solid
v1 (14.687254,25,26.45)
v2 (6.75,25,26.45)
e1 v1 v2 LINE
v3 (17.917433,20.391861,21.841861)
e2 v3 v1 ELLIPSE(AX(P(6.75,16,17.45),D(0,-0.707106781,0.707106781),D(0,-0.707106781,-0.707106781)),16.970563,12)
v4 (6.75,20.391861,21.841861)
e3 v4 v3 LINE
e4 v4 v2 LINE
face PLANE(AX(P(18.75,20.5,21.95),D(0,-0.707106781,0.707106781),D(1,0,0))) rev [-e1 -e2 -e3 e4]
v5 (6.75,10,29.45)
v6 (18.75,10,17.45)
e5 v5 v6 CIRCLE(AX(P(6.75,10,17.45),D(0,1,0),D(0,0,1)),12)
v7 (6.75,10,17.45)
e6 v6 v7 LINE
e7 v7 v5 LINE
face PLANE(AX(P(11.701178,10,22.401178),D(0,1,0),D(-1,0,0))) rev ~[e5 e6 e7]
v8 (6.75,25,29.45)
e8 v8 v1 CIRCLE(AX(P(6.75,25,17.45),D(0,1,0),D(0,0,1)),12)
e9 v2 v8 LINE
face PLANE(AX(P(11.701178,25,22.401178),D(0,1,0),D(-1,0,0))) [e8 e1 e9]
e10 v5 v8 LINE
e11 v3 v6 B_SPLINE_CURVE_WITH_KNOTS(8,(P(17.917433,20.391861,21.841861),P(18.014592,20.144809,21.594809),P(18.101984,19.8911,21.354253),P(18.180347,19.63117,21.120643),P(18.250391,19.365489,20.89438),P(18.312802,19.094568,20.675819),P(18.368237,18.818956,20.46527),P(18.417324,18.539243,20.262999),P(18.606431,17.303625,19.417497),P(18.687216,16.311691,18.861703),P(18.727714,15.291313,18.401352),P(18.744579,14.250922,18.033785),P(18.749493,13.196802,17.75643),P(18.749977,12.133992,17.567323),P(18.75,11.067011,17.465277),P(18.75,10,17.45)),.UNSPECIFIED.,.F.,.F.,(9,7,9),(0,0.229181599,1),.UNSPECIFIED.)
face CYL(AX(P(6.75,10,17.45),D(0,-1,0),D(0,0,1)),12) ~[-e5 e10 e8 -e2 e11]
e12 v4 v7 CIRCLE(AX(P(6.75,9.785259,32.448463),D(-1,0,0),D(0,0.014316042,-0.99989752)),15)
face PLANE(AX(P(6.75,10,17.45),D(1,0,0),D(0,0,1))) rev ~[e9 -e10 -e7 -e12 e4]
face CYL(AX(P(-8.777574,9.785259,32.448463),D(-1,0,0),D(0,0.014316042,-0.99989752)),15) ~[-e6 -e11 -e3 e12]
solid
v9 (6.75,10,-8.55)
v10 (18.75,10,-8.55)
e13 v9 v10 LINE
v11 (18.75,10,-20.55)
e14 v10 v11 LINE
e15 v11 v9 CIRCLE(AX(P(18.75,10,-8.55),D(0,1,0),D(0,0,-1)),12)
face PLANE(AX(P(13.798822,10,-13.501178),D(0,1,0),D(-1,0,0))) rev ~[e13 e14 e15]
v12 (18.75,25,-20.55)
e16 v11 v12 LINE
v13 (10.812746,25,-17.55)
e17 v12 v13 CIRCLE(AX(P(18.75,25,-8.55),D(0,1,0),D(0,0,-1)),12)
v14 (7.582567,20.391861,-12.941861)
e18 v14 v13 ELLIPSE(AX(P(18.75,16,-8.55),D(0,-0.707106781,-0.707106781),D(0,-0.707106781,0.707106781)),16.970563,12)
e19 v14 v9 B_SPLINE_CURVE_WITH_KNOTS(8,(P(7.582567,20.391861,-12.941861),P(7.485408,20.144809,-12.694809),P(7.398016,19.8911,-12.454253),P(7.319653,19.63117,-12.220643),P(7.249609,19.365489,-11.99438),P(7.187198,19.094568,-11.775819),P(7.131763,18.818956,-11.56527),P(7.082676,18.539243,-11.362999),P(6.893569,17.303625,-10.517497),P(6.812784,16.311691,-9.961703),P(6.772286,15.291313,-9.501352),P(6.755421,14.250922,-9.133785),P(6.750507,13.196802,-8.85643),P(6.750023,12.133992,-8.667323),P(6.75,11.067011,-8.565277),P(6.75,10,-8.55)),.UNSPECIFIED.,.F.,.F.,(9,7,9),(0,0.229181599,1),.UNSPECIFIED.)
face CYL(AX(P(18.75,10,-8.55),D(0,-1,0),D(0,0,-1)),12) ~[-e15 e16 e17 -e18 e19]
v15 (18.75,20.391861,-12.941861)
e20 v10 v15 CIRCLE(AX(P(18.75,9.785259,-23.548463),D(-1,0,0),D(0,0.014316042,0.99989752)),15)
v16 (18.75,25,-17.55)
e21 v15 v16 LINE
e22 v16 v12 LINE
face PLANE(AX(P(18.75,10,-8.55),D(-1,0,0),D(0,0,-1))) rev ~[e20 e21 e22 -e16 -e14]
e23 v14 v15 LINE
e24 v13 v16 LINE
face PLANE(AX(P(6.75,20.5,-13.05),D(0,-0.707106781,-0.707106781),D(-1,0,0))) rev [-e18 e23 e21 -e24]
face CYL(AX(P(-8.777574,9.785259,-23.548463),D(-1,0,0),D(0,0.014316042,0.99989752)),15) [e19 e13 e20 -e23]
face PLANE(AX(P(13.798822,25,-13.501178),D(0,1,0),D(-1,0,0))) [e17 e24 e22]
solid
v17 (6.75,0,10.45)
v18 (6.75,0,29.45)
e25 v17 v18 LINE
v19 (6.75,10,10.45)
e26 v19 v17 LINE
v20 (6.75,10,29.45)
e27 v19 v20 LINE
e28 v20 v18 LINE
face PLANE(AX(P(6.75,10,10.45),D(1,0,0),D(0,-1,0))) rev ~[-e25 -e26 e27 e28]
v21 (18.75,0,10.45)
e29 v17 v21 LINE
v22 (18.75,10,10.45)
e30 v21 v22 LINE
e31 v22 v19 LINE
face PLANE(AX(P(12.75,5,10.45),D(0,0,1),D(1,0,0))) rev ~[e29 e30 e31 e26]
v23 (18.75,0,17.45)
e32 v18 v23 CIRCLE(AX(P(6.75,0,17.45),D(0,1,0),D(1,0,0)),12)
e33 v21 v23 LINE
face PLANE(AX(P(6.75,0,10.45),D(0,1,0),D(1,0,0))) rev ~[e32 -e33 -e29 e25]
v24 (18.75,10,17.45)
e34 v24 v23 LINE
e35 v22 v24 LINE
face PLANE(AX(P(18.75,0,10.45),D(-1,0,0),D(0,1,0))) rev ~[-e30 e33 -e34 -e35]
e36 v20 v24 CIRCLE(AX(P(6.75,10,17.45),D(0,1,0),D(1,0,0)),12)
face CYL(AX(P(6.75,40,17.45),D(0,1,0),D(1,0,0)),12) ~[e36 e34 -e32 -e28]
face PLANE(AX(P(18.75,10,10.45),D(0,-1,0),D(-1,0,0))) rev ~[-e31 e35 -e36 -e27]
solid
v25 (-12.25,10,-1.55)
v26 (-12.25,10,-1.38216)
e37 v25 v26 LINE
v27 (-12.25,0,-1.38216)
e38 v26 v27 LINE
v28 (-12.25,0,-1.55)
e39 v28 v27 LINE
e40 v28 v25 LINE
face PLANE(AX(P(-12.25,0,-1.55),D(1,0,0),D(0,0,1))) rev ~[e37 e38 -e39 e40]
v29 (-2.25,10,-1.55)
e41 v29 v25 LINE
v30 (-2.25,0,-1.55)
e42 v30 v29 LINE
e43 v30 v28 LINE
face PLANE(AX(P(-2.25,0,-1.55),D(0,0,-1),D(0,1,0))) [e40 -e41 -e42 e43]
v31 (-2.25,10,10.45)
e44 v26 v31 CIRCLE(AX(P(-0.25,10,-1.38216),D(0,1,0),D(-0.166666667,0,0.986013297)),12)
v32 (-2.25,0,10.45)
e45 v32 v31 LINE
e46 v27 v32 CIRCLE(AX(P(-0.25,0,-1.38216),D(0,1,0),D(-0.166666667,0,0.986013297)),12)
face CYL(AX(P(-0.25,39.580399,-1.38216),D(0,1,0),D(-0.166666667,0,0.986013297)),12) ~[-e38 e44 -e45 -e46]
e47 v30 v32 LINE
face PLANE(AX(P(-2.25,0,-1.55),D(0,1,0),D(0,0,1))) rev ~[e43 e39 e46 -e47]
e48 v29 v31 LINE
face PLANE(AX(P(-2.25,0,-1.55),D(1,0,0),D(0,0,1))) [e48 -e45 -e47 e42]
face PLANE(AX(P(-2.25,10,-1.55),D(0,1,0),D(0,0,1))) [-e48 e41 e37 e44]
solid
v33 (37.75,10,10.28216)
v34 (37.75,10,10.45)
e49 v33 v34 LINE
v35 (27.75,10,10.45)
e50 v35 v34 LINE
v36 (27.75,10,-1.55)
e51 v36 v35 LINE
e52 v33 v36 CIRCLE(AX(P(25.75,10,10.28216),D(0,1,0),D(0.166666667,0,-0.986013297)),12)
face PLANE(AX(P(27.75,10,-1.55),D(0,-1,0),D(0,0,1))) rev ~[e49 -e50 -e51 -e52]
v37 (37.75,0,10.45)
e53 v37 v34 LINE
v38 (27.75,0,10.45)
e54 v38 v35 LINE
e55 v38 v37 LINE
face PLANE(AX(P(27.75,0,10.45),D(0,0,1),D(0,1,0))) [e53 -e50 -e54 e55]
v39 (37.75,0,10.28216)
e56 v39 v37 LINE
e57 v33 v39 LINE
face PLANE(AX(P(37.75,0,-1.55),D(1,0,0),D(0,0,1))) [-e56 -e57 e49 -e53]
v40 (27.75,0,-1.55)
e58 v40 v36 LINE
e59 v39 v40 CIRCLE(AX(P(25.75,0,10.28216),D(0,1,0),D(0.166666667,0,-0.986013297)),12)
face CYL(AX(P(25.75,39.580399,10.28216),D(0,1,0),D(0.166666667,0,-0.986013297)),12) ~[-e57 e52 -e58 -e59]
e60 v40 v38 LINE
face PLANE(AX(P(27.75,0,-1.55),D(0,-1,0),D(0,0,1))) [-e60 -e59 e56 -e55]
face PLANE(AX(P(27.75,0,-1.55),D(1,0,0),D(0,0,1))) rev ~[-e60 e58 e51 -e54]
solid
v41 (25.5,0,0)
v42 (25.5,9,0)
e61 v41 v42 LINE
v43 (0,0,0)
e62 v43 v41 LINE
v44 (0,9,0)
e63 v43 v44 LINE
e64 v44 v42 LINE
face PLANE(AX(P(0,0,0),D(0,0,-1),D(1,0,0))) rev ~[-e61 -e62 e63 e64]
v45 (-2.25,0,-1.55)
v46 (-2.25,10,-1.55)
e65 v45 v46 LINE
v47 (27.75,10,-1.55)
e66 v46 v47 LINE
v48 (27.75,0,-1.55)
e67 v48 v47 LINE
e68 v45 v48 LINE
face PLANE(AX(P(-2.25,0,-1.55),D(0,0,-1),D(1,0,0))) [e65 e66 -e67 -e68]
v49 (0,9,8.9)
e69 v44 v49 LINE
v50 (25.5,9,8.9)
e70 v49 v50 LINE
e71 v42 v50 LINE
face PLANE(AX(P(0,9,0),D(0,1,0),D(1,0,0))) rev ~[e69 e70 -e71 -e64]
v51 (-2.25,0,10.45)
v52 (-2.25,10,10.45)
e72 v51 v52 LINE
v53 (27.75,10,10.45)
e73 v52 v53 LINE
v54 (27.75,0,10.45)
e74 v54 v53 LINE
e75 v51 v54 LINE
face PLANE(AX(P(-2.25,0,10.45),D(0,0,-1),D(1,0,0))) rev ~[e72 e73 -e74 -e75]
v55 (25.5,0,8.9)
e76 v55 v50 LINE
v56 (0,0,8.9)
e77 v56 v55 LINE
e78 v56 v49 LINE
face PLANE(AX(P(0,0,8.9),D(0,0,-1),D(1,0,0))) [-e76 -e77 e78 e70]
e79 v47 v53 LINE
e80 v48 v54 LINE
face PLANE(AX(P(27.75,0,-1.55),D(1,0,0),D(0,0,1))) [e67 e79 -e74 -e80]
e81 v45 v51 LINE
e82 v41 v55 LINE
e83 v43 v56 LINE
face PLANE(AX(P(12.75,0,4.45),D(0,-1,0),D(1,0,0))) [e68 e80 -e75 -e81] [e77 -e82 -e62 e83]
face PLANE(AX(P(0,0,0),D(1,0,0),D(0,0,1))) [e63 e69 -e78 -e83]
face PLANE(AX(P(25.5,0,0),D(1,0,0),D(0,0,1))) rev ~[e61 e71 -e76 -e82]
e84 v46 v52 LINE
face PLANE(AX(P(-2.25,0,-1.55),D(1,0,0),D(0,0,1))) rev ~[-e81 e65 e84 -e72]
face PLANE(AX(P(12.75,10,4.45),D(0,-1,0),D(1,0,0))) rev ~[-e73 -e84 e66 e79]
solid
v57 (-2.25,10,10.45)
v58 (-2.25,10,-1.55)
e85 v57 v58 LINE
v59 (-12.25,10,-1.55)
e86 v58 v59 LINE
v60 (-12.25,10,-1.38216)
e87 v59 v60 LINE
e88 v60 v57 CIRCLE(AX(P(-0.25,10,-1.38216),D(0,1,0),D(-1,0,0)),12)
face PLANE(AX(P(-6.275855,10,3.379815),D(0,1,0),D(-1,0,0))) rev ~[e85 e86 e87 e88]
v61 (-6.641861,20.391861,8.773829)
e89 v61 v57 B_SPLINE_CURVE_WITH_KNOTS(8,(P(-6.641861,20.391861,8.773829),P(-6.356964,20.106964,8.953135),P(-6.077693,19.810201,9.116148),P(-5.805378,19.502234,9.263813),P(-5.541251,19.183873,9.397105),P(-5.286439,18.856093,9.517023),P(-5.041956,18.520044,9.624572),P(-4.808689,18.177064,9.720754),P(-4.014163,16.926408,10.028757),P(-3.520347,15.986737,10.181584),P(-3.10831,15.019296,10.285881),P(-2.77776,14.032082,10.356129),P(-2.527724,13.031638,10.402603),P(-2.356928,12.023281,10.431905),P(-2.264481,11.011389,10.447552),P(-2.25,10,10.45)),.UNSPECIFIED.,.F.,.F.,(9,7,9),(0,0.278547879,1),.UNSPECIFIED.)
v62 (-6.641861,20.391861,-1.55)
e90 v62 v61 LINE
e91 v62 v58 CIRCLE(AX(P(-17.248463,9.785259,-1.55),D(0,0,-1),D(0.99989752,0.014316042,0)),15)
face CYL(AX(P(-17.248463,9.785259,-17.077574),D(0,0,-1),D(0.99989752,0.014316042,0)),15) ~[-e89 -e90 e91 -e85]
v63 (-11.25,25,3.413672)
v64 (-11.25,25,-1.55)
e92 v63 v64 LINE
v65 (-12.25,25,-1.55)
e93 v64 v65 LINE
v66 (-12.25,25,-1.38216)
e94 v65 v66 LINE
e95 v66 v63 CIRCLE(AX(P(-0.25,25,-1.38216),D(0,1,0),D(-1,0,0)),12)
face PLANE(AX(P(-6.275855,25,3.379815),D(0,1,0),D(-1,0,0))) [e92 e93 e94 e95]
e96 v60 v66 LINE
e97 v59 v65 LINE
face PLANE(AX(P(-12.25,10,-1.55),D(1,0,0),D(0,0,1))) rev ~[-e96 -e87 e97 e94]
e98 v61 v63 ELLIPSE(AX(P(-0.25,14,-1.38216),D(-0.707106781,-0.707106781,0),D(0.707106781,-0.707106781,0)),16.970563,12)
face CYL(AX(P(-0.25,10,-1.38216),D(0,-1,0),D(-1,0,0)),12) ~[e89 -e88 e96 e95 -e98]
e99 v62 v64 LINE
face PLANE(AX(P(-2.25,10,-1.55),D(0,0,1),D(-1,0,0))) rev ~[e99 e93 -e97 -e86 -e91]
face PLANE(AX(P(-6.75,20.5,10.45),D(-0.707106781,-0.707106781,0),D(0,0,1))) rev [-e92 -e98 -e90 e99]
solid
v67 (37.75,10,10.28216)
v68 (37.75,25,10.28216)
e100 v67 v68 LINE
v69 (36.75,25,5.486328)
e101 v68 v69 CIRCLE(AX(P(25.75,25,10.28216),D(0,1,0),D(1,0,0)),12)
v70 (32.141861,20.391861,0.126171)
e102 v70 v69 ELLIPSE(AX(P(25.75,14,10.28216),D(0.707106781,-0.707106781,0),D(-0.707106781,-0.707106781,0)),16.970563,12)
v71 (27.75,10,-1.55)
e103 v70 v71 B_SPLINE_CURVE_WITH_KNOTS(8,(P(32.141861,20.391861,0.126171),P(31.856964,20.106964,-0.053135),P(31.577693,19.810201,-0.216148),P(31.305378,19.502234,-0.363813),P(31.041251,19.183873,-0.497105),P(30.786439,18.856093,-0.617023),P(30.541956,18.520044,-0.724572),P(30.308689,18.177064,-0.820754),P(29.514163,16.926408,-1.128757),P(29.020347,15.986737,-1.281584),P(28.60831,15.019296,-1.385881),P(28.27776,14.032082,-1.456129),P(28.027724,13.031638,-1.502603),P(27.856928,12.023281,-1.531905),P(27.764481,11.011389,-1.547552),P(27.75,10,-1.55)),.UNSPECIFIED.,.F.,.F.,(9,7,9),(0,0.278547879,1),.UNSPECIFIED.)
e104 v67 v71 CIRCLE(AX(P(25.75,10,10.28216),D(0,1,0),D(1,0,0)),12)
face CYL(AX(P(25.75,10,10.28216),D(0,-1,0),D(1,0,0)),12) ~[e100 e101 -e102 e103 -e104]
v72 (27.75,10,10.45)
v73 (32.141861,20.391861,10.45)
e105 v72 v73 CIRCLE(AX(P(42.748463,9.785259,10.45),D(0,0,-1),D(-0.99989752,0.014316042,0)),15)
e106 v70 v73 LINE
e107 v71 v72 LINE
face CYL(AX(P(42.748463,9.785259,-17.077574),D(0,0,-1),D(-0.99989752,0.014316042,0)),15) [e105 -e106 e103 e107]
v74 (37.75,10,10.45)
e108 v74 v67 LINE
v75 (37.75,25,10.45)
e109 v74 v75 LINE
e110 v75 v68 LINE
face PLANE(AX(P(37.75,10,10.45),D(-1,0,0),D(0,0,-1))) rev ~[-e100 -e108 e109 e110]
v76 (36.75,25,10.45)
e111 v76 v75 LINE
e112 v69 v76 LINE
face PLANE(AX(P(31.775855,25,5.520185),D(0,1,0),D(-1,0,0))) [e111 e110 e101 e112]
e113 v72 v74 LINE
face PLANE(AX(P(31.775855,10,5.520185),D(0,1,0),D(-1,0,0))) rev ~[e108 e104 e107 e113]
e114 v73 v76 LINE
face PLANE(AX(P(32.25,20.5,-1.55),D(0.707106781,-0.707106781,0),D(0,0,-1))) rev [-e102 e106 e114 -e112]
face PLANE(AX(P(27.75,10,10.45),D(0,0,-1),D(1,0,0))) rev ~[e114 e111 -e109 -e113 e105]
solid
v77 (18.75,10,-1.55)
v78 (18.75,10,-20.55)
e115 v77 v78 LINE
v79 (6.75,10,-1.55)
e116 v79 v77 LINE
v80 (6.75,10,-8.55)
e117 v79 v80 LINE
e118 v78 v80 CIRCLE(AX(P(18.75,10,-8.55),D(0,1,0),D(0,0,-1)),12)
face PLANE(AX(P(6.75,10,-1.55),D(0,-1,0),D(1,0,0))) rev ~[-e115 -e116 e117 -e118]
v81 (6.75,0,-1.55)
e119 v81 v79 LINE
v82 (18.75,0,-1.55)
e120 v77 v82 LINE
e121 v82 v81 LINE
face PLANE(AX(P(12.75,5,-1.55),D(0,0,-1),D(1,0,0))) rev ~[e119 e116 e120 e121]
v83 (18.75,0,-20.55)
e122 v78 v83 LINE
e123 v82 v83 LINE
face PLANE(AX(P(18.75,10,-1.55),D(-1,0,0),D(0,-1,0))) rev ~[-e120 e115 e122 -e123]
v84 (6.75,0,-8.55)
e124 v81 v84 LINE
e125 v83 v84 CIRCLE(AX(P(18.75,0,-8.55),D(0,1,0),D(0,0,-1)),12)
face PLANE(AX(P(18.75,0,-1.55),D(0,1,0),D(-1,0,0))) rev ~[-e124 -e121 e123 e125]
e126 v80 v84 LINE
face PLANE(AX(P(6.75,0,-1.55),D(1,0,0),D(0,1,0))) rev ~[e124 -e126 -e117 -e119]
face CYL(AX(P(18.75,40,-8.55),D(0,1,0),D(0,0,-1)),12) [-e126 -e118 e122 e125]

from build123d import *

# Parameters (mm, degrees)
F0_W            = 25.5
F0_H            = 8.9
F1_DEPTH        = 8.9
F2_W            = 30
F2_H            = 12
F2_W_2          = 25.5
F2_H_2          = 8.9
F3_DEPTH        = 10
F4_DEPTH        = 9
F5_DEPTH        = 10
F6_DEPTH        = 10
F8_DEPTH        = 19
F10_DEPTH       = 19
F11_T1_DEPTH    = 69.160797831
F11_2_T1_DEPTH  = 69.160797831
F11_3_T1_DEPTH  = 70
F11_4_T1_DEPTH  = 70
F13_DEPTH       = 15
F14_SIZE        = 9
F15_T1_DEPTH    = 43.0551475556
F15_S1_T1_DEPTH = 43.0551475556
F15_S2_T1_DEPTH = 43.0551475556
F15_S3_T1_DEPTH = 43.0551475556


# Not quite as in the source:
# - a fillet or chamfer that OpenCascade refuses, or shapes differently, is made with other operations: its cross-section is extruded or revolved along the edge and cut away or added


with BuildPart() as f1:
    # F0 (on Top) → F1 (new body)
    with BuildSketch(Plane.XY):
        with Locations((12.75, 4.45)):
            Rectangle(F0_W, F0_H)
    extrude(amount=F1_DEPTH)


with BuildPart() as f3:
    # F2 (on face) → F3 (new body)
    with BuildSketch(Plane.XZ):
        with Locations((12.75, 4.45)):
            Rectangle(F2_W, F2_H)
        with Locations((12.75, 4.45)):
            Rectangle(F2_W_2, F2_H_2, mode=Mode.SUBTRACT)
        with Locations((12.75, 4.45)):
            Rectangle(F2_W_2, F2_H_2)
    extrude(amount=-F3_DEPTH)


with BuildPart() as f4_tool:
    # F4 (cut): a face of the model
    f4_faces = [f1.part.faces().sort_by_distance(p)[0] for p in [
        (12.75, 0, 4.45),
    ]]
    extrude(f4_faces, amount=-F4_DEPTH)


with BuildPart() as f1_1:
    add(f1.part)

    # F4: cut by f4_tool
    add(f4_tool.part, mode=Mode.SUBTRACT)


with BuildPart() as f3_1:
    add(f3.part)

    # F4: cut by f4_tool
    add(f4_tool.part, mode=Mode.SUBTRACT)


with BuildPart() as f5:
    # F5 (new): a face of the model
    f5_faces = [f3_1.part.faces().sort_by_distance(p)[0] for p in [
        (-2.25, 5, 4.45),
    ]]
    extrude(f5_faces, amount=F5_DEPTH)

    # F11: fillet of radius 12 on 1 edges, made by hand

    # F11_s2 → F11_t1 (cut)
    with BuildSketch(Plane.XZ.offset(-39.5803989155)):
        with BuildLine():
            ThreePointArc((-2.25, 10.45), (-9.4151513899, 6.3638071262), (-12.25, -1.3821595662))
            Line((-12.25, -1.3821595662), (-12.25, 10.45))
            Line((-12.25, 10.45), (-2.25, 10.45))
        make_face()
    extrude(amount=F11_T1_DEPTH, mode=Mode.SUBTRACT)


with BuildPart() as f6:
    # F6 (new): a face of the model
    f6_faces = [f3_1.part.faces().sort_by_distance(p)[0] for p in [
        (27.75, 5, 4.45),
    ]]
    extrude(f6_faces, amount=F6_DEPTH)

    # F11#2: fillet of radius 12 on 1 edges, made by hand

    # F11_2_s2 → F11_2_t1 (cut)
    with BuildSketch(Plane.XZ.offset(-39.5803989155)):
        with BuildLine():
            ThreePointArc((27.75, -1.55), (34.9151513899, 2.5361928738), (37.75, 10.2821595662))
            Line((37.75, 10.2821595662), (37.75, -1.55))
            Line((37.75, -1.55), (27.75, -1.55))
        make_face()
    extrude(amount=F11_2_T1_DEPTH, mode=Mode.SUBTRACT)


with BuildPart() as f8:
    # F7 (on face) → F8 (new body)
    with BuildSketch(Plane.XY.offset(10.45)):
        Polygon((6.75, 0), (12.75, 0), (18.75, 0), (18.75, 10), (12.75, 10), (6.75, 10), align=None)
    extrude(amount=F8_DEPTH)

    # F11#3: fillet of radius 12 on 1 edges, made by hand

    # F11_3_s2 → F11_3_t1 (cut)
    with BuildSketch(Plane.XZ.offset(-40)):
        with BuildLine():
            ThreePointArc((18.75, 17.45), (15.2352813742, 25.9352813742), (6.75, 29.45))
            Line((6.75, 29.45), (18.75, 29.45))
            Line((18.75, 29.45), (18.75, 17.45))
        make_face()
    extrude(amount=F11_3_T1_DEPTH, mode=Mode.SUBTRACT)


with BuildPart() as f10:
    # F9 (on face) → F10 (new body)
    with BuildSketch(Plane(origin=(0, 0, -1.55), x_dir=(1, 0, 0), z_dir=(0, 0, -1))):
        Polygon((6.75, -10), (12.75, -10), (18.75, -10), (18.75, 0), (12.75, 0), (6.75, 0), align=None)
    extrude(amount=F10_DEPTH)

    # F11#4: fillet of radius 12 on 1 edges, made by hand

    # F11_4_s2 → F11_4_t1 (cut)
    with BuildSketch(Plane.XZ.offset(-40)):
        with BuildLine():
            ThreePointArc((18.75, -20.55), (10.2647186258, -17.0352813742), (6.75, -8.55))
            Line((6.75, -8.55), (6.75, -20.55))
            Line((6.75, -20.55), (18.75, -20.55))
        make_face()
    extrude(amount=F11_4_T1_DEPTH, mode=Mode.SUBTRACT)


with BuildPart() as f13:
    # F12 (on face) + F6_face (on face) + F5_face (on face) → F13 (new body)
    with BuildSketch(Plane(origin=(0, 10, 0), x_dir=(-1, 0, 0), z_dir=(0, 1, 0))):
        with BuildLine():
            Line((-6.75, -8.55), (-18.75, -8.55))
            Line((-18.75, -8.55), (-18.75, -20.55))
            ThreePointArc((-18.75, -20.55), (-10.2647186258, -17.0352813742), (-6.75, -8.55))
        make_face()
        with BuildLine():
            ThreePointArc((-6.75, 29.45), (-15.2352813742, 25.9352813742), (-18.75, 17.45))
            Line((-18.75, 17.45), (-6.75, 17.45))
            Line((-6.75, 17.45), (-6.75, 29.45))
        make_face()
    with BuildSketch(Plane(origin=(31.9545650096, 10, 5.515900775), x_dir=(-1, 0, 0), z_dir=(0, 1, 0))):
        with BuildLine():
            Line((4.2045650096, -7.065900775), (4.2045650096, 4.934099225))
            Line((4.2045650096, 4.934099225), (-5.7954349904, 4.934099225))
            Line((-5.7954349904, 4.934099225), (-5.7954349904, 4.7662587912))
            ThreePointArc((-5.7954349904, 4.7662587912), (-2.9605863803, -2.9797079012), (4.2045650096, -7.065900775))
        make_face()
    with BuildSketch(Plane(origin=(-6.4545650096, 10, 3.384099225), x_dir=(-1, 0, 0), z_dir=(0, 1, 0))):
        with BuildLine():
            Line((-4.2045650096, 7.065900775), (-4.2045650096, -4.934099225))
            Line((-4.2045650096, -4.934099225), (5.7954349904, -4.934099225))
            Line((5.7954349904, -4.934099225), (5.7954349904, -4.7662587912))
            ThreePointArc((5.7954349904, -4.7662587912), (2.9605863803, 2.9797079012), (-4.2045650096, 7.065900775))
        make_face()
    extrude(amount=F13_DEPTH)

    # F14
    f14_edges = [f13.edges().sort_by_distance(p)[0] for p in [
        (-2.25, 25, 4.45),
        (12.75, 25, 17.45),
        (27.75, 25, 4.45),
        (12.75, 25, -8.55),
    ]]
    chamfer(f14_edges, length=F14_SIZE)

    # F15: fillet of radius 15 on 1 edges, made by hand

    # F15_s2 → F15_t1 (cut)
    with BuildSketch(Plane.XY.offset(-17.0775737778)):
        with BuildLine():
            ThreePointArc((-2.25, 10), (-3.4317147602, 15.6245635654), (-6.6418610855, 20.3918610855))
            Line((-6.6418610855, 20.3918610855), (-2.25, 16))
            Line((-2.25, 16), (-2.25, 10))
        make_face()
    extrude(amount=F15_T1_DEPTH, mode=Mode.SUBTRACT)

    # F15#s1: fillet of radius 15 on 1 edges, made by hand

    # F15_s1_s2 → F15_s1_t1 (cut)
    with BuildSketch(Plane.YZ.offset(-8.7775737778)):
        with BuildLine():
            ThreePointArc((10, 17.45), (15.6245635654, 18.6317147602), (20.3918610855, 21.8418610855))
            Line((20.3918610855, 21.8418610855), (16, 17.45))
            Line((16, 17.45), (10, 17.45))
        make_face()
    extrude(amount=F15_S1_T1_DEPTH, mode=Mode.SUBTRACT)

    # F15#s2: fillet of radius 15 on 1 edges, made by hand

    # F15_s2_s2 → F15_s2_t1 (cut)
    with BuildSketch(Plane.XY.offset(-17.0775737778)):
        with BuildLine():
            ThreePointArc((27.75, 10), (28.9317147602, 15.6245635654), (32.1418610855, 20.3918610855))
            Line((32.1418610855, 20.3918610855), (27.75, 16))
            Line((27.75, 16), (27.75, 10))
        make_face()
    extrude(amount=F15_S2_T1_DEPTH, mode=Mode.SUBTRACT)

    # F15#s3: fillet of radius 15 on 1 edges, made by hand

    # F15_s3_s2 → F15_s3_t1 (cut)
    with BuildSketch(Plane.YZ.offset(-8.7775737778)):
        with BuildLine():
            ThreePointArc((10, -8.55), (15.6245635654, -9.7317147602), (20.3918610855, -12.9418610855))
            Line((20.3918610855, -12.9418610855), (16, -8.55))
            Line((16, -8.55), (10, -8.55))
        make_face()
    extrude(amount=F15_S3_T1_DEPTH, mode=Mode.SUBTRACT)


solid = Compound([f3_1.part, f5.part, f6.part, f8.part, f10.part, f13.part])
